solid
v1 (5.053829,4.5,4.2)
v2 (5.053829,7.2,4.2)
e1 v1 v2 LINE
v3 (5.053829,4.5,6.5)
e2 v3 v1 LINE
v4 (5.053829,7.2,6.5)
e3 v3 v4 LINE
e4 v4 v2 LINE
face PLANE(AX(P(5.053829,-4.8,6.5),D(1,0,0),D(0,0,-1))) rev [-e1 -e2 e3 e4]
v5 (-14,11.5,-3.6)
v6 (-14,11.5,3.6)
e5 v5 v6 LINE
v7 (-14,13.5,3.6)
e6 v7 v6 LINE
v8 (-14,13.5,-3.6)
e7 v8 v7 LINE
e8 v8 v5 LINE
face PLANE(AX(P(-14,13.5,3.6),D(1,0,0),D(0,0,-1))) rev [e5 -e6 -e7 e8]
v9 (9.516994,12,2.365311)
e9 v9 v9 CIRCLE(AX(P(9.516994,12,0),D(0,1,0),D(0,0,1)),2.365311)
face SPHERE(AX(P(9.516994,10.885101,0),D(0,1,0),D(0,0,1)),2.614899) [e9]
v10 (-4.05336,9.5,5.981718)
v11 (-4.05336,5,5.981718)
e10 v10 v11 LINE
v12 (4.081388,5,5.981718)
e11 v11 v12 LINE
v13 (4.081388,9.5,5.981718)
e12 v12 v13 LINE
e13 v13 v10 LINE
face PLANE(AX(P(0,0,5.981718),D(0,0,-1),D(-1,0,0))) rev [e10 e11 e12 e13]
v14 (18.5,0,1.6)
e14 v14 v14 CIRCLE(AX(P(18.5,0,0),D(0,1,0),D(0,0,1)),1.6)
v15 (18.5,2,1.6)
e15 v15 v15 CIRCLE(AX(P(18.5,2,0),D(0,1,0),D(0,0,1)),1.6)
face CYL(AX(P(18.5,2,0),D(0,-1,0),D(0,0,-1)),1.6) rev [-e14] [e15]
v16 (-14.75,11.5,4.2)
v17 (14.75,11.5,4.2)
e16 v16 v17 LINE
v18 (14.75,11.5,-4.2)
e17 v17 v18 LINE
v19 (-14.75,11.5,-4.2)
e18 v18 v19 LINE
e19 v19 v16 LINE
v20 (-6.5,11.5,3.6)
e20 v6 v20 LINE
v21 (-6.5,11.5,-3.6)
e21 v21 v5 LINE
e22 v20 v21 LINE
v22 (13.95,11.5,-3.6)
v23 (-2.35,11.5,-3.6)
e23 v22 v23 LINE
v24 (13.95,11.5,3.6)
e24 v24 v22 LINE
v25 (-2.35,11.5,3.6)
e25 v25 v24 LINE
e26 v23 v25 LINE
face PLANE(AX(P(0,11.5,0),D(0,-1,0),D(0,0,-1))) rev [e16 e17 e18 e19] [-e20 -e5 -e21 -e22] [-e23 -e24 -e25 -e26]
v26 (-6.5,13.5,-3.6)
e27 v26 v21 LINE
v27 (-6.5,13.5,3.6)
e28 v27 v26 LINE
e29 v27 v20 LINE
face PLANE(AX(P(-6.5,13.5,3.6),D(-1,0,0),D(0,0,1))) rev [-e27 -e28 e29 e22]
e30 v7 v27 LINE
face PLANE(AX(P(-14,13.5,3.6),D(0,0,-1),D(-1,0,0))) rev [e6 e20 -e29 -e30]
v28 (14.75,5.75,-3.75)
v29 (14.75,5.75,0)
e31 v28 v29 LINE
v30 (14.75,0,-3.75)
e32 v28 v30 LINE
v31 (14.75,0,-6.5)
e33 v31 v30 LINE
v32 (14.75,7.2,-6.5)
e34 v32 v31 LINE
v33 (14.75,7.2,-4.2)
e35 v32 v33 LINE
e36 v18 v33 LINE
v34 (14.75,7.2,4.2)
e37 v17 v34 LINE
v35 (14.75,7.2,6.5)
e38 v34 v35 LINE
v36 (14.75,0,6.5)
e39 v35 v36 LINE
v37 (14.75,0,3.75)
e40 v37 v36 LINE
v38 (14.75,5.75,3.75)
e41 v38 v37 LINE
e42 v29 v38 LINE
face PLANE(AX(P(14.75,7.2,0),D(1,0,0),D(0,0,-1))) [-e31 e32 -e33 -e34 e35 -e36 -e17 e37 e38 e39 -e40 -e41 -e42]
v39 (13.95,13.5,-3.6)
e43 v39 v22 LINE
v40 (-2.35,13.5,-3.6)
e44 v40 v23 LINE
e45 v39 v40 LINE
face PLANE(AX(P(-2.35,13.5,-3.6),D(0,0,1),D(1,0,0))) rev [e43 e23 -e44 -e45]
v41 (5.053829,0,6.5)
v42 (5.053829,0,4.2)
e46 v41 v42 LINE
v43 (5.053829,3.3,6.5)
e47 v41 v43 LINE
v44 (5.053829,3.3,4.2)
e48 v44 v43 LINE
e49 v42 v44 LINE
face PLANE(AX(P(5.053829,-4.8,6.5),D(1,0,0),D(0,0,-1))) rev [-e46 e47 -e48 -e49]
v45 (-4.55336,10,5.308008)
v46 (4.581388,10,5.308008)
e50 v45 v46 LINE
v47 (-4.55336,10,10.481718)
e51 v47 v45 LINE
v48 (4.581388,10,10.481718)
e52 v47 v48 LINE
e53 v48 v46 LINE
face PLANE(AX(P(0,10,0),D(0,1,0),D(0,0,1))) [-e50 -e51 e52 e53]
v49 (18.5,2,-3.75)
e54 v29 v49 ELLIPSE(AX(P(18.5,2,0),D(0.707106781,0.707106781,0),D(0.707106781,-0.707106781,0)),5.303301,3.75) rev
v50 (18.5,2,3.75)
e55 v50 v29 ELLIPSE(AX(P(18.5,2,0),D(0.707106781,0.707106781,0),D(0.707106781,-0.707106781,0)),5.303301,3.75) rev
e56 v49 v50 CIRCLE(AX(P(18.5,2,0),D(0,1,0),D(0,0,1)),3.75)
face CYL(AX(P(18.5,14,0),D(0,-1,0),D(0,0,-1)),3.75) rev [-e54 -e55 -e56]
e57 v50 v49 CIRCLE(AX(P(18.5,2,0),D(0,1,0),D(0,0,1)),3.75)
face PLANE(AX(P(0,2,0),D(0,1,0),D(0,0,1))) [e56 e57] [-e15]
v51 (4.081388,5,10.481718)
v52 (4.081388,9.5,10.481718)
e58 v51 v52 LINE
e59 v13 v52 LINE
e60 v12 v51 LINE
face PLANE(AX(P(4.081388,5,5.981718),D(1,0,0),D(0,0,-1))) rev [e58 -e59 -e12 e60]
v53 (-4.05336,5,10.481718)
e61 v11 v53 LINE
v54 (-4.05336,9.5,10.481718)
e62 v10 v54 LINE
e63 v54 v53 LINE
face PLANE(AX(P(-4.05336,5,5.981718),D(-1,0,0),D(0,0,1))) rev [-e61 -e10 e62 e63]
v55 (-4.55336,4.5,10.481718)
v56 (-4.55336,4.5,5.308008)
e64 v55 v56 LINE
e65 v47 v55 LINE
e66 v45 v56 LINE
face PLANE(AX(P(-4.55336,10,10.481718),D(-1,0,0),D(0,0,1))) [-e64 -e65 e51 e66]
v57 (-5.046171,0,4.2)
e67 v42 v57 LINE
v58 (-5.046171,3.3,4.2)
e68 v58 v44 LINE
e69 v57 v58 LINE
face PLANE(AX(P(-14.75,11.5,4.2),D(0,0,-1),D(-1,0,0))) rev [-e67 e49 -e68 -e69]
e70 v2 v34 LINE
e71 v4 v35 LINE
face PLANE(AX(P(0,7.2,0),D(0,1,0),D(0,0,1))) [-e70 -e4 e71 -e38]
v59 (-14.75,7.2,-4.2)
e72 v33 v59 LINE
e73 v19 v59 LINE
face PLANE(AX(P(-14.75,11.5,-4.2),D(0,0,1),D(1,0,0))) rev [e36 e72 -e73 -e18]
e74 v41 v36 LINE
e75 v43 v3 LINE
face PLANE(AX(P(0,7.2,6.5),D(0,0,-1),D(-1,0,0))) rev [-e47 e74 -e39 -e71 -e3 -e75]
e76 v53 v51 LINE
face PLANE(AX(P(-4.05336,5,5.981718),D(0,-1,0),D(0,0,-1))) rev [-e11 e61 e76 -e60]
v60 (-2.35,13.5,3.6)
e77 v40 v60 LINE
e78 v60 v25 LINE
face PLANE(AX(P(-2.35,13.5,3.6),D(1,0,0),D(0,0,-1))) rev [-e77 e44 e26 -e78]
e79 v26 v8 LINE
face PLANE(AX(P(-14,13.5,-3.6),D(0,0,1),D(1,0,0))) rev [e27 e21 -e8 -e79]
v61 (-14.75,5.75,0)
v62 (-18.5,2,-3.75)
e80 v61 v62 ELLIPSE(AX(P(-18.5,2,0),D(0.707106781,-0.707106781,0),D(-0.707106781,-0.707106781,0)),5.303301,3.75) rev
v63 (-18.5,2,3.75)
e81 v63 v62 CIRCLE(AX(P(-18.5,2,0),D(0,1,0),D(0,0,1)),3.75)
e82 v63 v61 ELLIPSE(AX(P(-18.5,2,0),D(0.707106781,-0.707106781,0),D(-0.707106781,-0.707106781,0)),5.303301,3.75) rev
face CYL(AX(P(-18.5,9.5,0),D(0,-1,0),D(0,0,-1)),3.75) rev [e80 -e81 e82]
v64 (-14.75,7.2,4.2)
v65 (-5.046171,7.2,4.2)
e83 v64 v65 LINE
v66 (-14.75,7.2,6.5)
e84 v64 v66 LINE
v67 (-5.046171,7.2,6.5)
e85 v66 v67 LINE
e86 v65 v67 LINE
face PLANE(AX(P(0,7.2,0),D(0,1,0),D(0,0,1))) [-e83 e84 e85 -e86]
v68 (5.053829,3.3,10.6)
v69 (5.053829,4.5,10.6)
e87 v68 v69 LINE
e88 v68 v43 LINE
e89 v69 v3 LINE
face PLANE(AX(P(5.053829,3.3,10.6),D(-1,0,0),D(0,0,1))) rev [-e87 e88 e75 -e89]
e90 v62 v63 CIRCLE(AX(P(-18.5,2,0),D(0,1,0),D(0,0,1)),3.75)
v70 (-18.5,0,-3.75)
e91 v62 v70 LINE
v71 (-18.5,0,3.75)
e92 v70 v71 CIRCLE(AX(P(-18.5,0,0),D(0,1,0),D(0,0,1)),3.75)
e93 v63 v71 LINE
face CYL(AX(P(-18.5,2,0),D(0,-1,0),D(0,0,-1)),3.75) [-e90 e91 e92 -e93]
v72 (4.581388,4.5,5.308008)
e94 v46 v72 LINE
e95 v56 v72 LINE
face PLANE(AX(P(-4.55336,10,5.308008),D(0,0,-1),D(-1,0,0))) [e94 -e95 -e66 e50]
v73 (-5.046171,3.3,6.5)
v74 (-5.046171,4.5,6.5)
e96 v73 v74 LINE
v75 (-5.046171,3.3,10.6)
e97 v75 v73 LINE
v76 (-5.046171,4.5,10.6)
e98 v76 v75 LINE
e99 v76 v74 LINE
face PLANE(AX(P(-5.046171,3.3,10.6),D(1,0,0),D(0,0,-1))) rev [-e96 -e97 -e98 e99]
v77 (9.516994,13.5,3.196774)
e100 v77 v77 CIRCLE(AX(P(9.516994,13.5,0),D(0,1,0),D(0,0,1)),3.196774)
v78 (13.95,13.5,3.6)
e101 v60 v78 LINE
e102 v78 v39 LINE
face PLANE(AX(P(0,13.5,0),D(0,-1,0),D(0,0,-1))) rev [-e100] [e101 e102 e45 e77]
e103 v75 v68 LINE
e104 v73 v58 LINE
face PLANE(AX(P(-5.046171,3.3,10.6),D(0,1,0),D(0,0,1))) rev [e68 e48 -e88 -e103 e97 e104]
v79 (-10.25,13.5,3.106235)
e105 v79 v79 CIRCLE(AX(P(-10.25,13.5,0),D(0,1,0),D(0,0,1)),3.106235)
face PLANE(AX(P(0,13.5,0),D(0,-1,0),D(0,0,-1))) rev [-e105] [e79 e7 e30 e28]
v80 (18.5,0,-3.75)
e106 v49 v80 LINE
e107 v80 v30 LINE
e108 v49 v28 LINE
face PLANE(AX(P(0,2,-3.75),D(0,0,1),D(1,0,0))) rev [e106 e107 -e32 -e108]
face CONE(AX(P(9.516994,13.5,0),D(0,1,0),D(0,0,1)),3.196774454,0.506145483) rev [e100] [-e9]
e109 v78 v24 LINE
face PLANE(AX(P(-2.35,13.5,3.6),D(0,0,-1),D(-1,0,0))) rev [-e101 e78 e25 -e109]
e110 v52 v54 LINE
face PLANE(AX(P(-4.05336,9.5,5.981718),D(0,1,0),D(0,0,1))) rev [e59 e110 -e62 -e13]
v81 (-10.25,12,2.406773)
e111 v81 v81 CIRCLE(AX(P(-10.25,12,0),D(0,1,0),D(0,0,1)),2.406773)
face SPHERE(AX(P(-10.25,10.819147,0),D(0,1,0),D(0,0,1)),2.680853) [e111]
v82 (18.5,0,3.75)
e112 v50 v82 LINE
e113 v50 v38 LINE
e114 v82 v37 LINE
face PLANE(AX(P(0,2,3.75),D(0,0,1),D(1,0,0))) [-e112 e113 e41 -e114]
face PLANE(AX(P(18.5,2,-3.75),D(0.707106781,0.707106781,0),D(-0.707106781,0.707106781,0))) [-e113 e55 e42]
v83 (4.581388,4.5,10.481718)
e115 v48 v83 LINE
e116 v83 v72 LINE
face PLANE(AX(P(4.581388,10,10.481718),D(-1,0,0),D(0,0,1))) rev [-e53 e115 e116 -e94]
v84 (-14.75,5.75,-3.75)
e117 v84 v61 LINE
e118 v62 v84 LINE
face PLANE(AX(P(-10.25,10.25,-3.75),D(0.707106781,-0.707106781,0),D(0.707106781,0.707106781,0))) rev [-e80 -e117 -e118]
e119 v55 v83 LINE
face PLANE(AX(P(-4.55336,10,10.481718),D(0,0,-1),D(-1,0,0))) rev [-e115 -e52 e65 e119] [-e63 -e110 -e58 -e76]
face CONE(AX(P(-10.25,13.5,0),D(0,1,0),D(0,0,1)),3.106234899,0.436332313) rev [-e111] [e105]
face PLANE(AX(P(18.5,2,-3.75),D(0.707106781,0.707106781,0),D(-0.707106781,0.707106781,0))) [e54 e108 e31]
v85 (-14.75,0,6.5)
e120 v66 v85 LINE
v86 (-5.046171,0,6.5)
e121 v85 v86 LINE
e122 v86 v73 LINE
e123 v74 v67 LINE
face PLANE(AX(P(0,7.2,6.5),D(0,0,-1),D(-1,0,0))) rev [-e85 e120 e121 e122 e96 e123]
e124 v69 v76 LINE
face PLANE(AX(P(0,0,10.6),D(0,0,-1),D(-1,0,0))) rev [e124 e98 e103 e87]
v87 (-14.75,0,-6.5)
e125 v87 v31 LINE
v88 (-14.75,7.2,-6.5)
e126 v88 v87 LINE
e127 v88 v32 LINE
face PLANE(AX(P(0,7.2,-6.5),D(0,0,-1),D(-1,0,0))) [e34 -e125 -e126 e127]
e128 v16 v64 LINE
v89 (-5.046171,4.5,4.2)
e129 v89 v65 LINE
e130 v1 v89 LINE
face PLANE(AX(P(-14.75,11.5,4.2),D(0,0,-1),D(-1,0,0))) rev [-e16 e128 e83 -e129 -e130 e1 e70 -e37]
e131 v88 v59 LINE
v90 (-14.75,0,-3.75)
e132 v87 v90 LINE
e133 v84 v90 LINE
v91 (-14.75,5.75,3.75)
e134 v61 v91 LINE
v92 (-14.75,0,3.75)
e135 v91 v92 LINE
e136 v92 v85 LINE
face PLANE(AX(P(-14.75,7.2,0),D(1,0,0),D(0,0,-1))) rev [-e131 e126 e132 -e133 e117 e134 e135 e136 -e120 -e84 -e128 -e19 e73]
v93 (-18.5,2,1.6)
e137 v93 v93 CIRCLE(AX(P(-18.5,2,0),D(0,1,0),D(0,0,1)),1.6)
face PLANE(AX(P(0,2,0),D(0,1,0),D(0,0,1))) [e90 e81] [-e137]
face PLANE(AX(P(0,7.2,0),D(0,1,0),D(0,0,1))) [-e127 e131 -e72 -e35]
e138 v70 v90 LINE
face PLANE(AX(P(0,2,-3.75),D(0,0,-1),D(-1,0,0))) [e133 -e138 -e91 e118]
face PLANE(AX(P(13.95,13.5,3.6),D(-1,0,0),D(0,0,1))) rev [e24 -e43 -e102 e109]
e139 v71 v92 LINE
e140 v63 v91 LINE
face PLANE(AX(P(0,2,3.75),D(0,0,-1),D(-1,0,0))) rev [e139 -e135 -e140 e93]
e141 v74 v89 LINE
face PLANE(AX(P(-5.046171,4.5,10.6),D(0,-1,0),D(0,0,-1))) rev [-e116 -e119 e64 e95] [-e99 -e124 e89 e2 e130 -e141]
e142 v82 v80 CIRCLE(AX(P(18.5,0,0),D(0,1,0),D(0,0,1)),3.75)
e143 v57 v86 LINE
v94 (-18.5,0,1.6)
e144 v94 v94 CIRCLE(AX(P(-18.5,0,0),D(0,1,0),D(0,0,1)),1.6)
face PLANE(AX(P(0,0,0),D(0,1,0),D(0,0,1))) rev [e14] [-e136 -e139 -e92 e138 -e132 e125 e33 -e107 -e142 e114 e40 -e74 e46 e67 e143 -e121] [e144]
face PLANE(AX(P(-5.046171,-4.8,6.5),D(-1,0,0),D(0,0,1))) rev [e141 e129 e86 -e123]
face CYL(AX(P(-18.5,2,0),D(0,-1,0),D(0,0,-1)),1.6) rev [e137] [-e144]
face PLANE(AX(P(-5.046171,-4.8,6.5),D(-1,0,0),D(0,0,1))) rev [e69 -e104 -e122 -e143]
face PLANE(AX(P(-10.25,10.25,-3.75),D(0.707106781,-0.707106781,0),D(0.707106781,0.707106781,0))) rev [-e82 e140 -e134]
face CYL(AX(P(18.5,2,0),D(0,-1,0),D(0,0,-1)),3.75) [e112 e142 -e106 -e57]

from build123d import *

# Parameters (mm, degrees)
BOSS_EXTRUDE1_DEPTH   = 7.2
SKETCH1_3_R           = 3.75
SKETCH1_3_R_2         = 1.6
BOSS_EXTRUDE2_DEPTH   = 2
BOSS_EXTRUDE2_2_DEPTH = 2
BOSS_EXTRUDE3_DEPTH   = 2
BOSS_EXTRUDE4_DEPTH   = 7.5
SKETCH3_R             = 3.75
CUT_EXTRUDE6_DEPTH    = 12
BOSS_EXTRUDE5_DEPTH   = 7.5
SKETCH5_R             = 3.75
CUT_EXTRUDE7_DEPTH    = 7.5
SKETCH6_W             = 29.5
SKETCH6_H             = 8.4
BOSS_EXTRUDE6_DEPTH   = 4.3
SKETCH7_W             = 7.5
SKETCH7_H             = 7.2
SKETCH7_W_2           = 16.3
BOSS_EXTRUDE7_DEPTH   = 2
SKETCH8_W             = 10.1
SKETCH8_H             = 2.3
CUT_EXTRUDE8_DEPTH    = 12
SKETCH9_W             = 10.1
SKETCH9_H             = 1.2
BOSS_EXTRUDE8_DEPTH   = 6.4
SKETCH11_W            = 9.1347476
SKETCH11_H            = 5.173710516
BOSS_EXTRUDE11_DEPTH  = 5.5
SKETCH12_R            = 3.106234899
CUT_EXTRUDE10_DEPTH   = 1.5
CUT_EXTRUDE10_DRAFT   = -25
SKETCH13_R            = 3.196774454
CUT_EXTRUDE11_DEPTH   = 1.5
CUT_EXTRUDE11_DRAFT   = -29
SKETCH14_W            = 8.1347476
SKETCH14_H            = 4.5
CUT_EXTRUDE12_DEPTH   = 4.5


# Read off the part's stored shape, not the designer's step: Dome1, Dome2
with BuildPart() as part:
    # Sketch1 → Boss-Extrude1 (new body)
    with BuildSketch(Plane(origin=(0, 0, 0), x_dir=(1, 0, 0), z_dir=(0, 1, 0))):
        Polygon((14.75, 0), (-14.75, 0), (-14.75, -3.75), (-14.75, -6.5), (14.75, -6.5), (14.75, -3.75), align=None)
        Polygon((-14.75, 3.75), (-14.75, 0), (14.75, 0), (14.75, 3.75), (14.75, 6.5), (-14.75, 6.5), align=None)
    extrude(amount=BOSS_EXTRUDE1_DEPTH)



with BuildPart() as body_2:
    # Sketch1<3> → Boss-Extrude2 (new body)
    with BuildSketch(Plane(origin=(0, 0, 0), x_dir=(1, 0, 0), z_dir=(0, 1, 0))):
        with Locations(Location((-18.5, 0, 0), (0, 0, 270))):
            Circle(SKETCH1_3_R)
        with Locations(Location((-18.5, 0, 0), (0, 0, 270))):
            Circle(SKETCH1_3_R_2, mode=Mode.SUBTRACT)
    extrude(amount=BOSS_EXTRUDE2_DEPTH)


with BuildPart() as body_3:
    # Sketch1<3> → Boss-Extrude2 2 (new body)
    with BuildSketch(Plane(origin=(0, 0, 0), x_dir=(1, 0, 0), z_dir=(0, 1, 0))):
        with Locations(Location((18.5, 0, 0), (0, 0, 270))):
            Circle(SKETCH1_3_R)
        with Locations(Location((18.5, 0, 0), (0, 0, 270))):
            Circle(SKETCH1_3_R_2, mode=Mode.SUBTRACT)
    extrude(amount=BOSS_EXTRUDE2_2_DEPTH)


with BuildPart() as part_1:
    add(part.part)

    add(body_2.part)  # Boss-Extrude3 merges body 2

    add(body_3.part)  # Boss-Extrude3 merges body 3
    # Sketch1<4> → Boss-Extrude3 (add)
    with BuildSketch(Plane(origin=(0, 0, 0), x_dir=(1, 0, 0), z_dir=(0, 1, 0))):
        with BuildLine():
            Line((-14.75, -3.75), (-14.75, 0))
            ThreePointArc((-14.75, 0), (-15.848349571, -2.651650429), (-18.5, -3.75))
            Line((-18.5, -3.75), (-14.75, -3.75))
        make_face()
        with BuildLine():
            Line((-14.75, 0), (-14.75, 3.75))
            Line((-14.75, 3.75), (-18.5, 3.75))
            ThreePointArc((-18.5, 3.75), (-15.848349571, 2.651650429), (-14.75, 0))
        make_face()
        with BuildLine():
            Line((18.5, 3.75), (14.75, 3.75))
            Line((14.75, 3.75), (14.75, 0))
            ThreePointArc((14.75, 0), (15.848349571, 2.651650429), (18.5, 3.75))
        make_face()
        with BuildLine():
            ThreePointArc((18.5, -3.75), (15.848349571, -2.651650429), (14.75, 0))
            Line((14.75, 0), (14.75, -3.75))
            Line((14.75, -3.75), (18.5, -3.75))
        make_face()
    extrude(amount=BOSS_EXTRUDE3_DEPTH)

    # Sketch2 → Boss-Extrude4 (add)
    with BuildSketch(Plane.XY.offset(3.75)):
        Polygon((18.5, 2), (14.75, 2), (14.75, 5.75), align=None)
    extrude(amount=-BOSS_EXTRUDE4_DEPTH)

    # Sketch3 → Cut-Extrude6 (cut)
    with BuildSketch(Plane(origin=(0, 2, 0), x_dir=(1, 0, 0), z_dir=(0, 1, 0))):
        with Locations((18.5, 0)):
            Circle(SKETCH3_R)
    extrude(amount=CUT_EXTRUDE6_DEPTH, mode=Mode.SUBTRACT)

    # Sketch4 → Boss-Extrude5 (add)
    with BuildSketch(Plane.XY.offset(3.75)):
        Polygon((-14.75, 5.75), (-18.5, 2), (-14.75, 2), align=None)
    extrude(amount=-BOSS_EXTRUDE5_DEPTH)

    # Sketch5 → Cut-Extrude7 (cut)
    with BuildSketch(Plane(origin=(0, 2, 0), x_dir=(1, 0, 0), z_dir=(0, 1, 0))):
        with Locations((-18.5, 0)):
            Circle(SKETCH5_R)
    extrude(amount=CUT_EXTRUDE7_DEPTH, mode=Mode.SUBTRACT)

    # Sketch6 → Boss-Extrude6 (add)
    with BuildSketch(Plane(origin=(0, 7.2, 0), x_dir=(1, 0, 0), z_dir=(0, 1, 0))):
        Rectangle(SKETCH6_W, SKETCH6_H)
    extrude(amount=BOSS_EXTRUDE6_DEPTH)

    # Sketch7 → Boss-Extrude7 (add)
    with BuildSketch(Plane(origin=(0, 11.5, 0), x_dir=(1, 0, 0), z_dir=(0, 1, 0))):
        with Locations((-10.25, 0)):
            Rectangle(SKETCH7_W, SKETCH7_H)
        with Locations((5.8, 0)):
            Rectangle(SKETCH7_W_2, SKETCH7_H)
    extrude(amount=BOSS_EXTRUDE7_DEPTH)

    # Sketch8 → Cut-Extrude8 (cut)
    with BuildSketch(Plane(origin=(0, 7.2, 0), x_dir=(1, 0, 0), z_dir=(0, 1, 0))):
        with Locations((0.003829246, -5.35)):
            Rectangle(SKETCH8_W, SKETCH8_H)
    extrude(amount=-CUT_EXTRUDE8_DEPTH, mode=Mode.SUBTRACT)

    # Sketch9 → Boss-Extrude8 (add)
    with BuildSketch(Plane.XY.offset(4.2)):
        with Locations((0.003829246, 3.9)):
            Rectangle(SKETCH9_W, SKETCH9_H)
    extrude(amount=BOSS_EXTRUDE8_DEPTH)

    # Sketch11 → Boss-Extrude11 (add)
    with BuildSketch(Plane(origin=(0, 4.5, 0), x_dir=(1, 0, 0), z_dir=(0, 1, 0))):
        with Locations((0.014014126, -7.894862881)):
            Rectangle(SKETCH11_W, SKETCH11_H)
    extrude(amount=BOSS_EXTRUDE11_DEPTH)


with BuildPart() as cut_extrude10_tool:
    # Sketch12 → Cut-Extrude10 (with draft: the straight prism first)
    with BuildSketch(Plane(origin=(0, 13.5, 0), x_dir=(1, 0, 0), z_dir=(0, 1, 0))):
        with Locations((-10.25, 0)):
            Circle(SKETCH12_R)
    extrude(amount=-CUT_EXTRUDE10_DEPTH)
    # Cut-Extrude10: the draft: its side faces are tilted about the plane it starts from
    cut_extrude10_sides = [cut_extrude10_tool.faces().sort_by_distance(p)[0] for p in [
        (-13.356234899, 12.75, 0),
    ]]
    draft(cut_extrude10_sides, Plane(origin=(0, 13.5, 0), x_dir=(1, 0, 0), z_dir=(0, 1, 0)), CUT_EXTRUDE10_DRAFT)


with BuildPart() as part_2:
    add(part_1.part)

    # Cut-Extrude10: cut by cut_extrude10_tool
    add(cut_extrude10_tool.part, mode=Mode.SUBTRACT)


with BuildPart() as cut_extrude11_tool:
    # Sketch13 → Cut-Extrude11 (with draft: the straight prism first)
    with BuildSketch(Plane(origin=(0, 13.5, 0), x_dir=(1, 0, 0), z_dir=(0, 1, 0))):
        with Locations((9.516994158, 0)):
            Circle(SKETCH13_R)
    extrude(amount=-CUT_EXTRUDE11_DEPTH)
    # Cut-Extrude11: the draft: its side faces are tilted about the plane it starts from
    cut_extrude11_sides = [cut_extrude11_tool.faces().sort_by_distance(p)[0] for p in [
        (6.320219704, 12.75, 0),
    ]]
    draft(cut_extrude11_sides, Plane(origin=(0, 13.5, 0), x_dir=(1, 0, 0), z_dir=(0, 1, 0)), CUT_EXTRUDE11_DRAFT)


with BuildPart() as part_3:
    add(part_2.part)

    # Cut-Extrude11: cut by cut_extrude11_tool
    add(cut_extrude11_tool.part, mode=Mode.SUBTRACT)

    # Dome1 outline → Dome1 (revolve)
    with BuildSketch(Plane(origin=(-10.25, 0, 0), x_dir=(1, 0, 0), z_dir=(0, 0, 1))):
        with BuildLine():
            Line((0, 12), (2.406773413, 11.999999998))
            ThreePointArc((2.406773413, 11.999999998), (1.417970228, 13.094302608), (0, 13.5))
            Line((0, 13.5), (0, 12))
        make_face()
    revolve(axis=Axis((-10.25, 0, 0), (0, 1, 0)))

    # Dome2 outline → Dome2 (revolve)
    with BuildSketch(Plane(origin=(9.516994158, 0, 0), x_dir=(1, 0, 0), z_dir=(0, 0, 1))):
        with BuildLine():
            Line((0, 12), (2.365310878, 11.999999998))
            ThreePointArc((2.365310878, 11.999999998), (1.400419183, 13.093385967), (0, 13.5))
            Line((0, 13.5), (0, 12))
        make_face()
    revolve(axis=Axis((9.516994158, 0, 0), (0, 1, 0)))

    # Sketch14 → Cut-Extrude12 (cut)
    with BuildSketch(Plane.XY.offset(10.481718139)):
        with Locations((0.014014126, 7.25)):
            Rectangle(SKETCH14_W, SKETCH14_H)
    extrude(amount=-CUT_EXTRUDE12_DEPTH, mode=Mode.SUBTRACT)


solid = part_3.part
